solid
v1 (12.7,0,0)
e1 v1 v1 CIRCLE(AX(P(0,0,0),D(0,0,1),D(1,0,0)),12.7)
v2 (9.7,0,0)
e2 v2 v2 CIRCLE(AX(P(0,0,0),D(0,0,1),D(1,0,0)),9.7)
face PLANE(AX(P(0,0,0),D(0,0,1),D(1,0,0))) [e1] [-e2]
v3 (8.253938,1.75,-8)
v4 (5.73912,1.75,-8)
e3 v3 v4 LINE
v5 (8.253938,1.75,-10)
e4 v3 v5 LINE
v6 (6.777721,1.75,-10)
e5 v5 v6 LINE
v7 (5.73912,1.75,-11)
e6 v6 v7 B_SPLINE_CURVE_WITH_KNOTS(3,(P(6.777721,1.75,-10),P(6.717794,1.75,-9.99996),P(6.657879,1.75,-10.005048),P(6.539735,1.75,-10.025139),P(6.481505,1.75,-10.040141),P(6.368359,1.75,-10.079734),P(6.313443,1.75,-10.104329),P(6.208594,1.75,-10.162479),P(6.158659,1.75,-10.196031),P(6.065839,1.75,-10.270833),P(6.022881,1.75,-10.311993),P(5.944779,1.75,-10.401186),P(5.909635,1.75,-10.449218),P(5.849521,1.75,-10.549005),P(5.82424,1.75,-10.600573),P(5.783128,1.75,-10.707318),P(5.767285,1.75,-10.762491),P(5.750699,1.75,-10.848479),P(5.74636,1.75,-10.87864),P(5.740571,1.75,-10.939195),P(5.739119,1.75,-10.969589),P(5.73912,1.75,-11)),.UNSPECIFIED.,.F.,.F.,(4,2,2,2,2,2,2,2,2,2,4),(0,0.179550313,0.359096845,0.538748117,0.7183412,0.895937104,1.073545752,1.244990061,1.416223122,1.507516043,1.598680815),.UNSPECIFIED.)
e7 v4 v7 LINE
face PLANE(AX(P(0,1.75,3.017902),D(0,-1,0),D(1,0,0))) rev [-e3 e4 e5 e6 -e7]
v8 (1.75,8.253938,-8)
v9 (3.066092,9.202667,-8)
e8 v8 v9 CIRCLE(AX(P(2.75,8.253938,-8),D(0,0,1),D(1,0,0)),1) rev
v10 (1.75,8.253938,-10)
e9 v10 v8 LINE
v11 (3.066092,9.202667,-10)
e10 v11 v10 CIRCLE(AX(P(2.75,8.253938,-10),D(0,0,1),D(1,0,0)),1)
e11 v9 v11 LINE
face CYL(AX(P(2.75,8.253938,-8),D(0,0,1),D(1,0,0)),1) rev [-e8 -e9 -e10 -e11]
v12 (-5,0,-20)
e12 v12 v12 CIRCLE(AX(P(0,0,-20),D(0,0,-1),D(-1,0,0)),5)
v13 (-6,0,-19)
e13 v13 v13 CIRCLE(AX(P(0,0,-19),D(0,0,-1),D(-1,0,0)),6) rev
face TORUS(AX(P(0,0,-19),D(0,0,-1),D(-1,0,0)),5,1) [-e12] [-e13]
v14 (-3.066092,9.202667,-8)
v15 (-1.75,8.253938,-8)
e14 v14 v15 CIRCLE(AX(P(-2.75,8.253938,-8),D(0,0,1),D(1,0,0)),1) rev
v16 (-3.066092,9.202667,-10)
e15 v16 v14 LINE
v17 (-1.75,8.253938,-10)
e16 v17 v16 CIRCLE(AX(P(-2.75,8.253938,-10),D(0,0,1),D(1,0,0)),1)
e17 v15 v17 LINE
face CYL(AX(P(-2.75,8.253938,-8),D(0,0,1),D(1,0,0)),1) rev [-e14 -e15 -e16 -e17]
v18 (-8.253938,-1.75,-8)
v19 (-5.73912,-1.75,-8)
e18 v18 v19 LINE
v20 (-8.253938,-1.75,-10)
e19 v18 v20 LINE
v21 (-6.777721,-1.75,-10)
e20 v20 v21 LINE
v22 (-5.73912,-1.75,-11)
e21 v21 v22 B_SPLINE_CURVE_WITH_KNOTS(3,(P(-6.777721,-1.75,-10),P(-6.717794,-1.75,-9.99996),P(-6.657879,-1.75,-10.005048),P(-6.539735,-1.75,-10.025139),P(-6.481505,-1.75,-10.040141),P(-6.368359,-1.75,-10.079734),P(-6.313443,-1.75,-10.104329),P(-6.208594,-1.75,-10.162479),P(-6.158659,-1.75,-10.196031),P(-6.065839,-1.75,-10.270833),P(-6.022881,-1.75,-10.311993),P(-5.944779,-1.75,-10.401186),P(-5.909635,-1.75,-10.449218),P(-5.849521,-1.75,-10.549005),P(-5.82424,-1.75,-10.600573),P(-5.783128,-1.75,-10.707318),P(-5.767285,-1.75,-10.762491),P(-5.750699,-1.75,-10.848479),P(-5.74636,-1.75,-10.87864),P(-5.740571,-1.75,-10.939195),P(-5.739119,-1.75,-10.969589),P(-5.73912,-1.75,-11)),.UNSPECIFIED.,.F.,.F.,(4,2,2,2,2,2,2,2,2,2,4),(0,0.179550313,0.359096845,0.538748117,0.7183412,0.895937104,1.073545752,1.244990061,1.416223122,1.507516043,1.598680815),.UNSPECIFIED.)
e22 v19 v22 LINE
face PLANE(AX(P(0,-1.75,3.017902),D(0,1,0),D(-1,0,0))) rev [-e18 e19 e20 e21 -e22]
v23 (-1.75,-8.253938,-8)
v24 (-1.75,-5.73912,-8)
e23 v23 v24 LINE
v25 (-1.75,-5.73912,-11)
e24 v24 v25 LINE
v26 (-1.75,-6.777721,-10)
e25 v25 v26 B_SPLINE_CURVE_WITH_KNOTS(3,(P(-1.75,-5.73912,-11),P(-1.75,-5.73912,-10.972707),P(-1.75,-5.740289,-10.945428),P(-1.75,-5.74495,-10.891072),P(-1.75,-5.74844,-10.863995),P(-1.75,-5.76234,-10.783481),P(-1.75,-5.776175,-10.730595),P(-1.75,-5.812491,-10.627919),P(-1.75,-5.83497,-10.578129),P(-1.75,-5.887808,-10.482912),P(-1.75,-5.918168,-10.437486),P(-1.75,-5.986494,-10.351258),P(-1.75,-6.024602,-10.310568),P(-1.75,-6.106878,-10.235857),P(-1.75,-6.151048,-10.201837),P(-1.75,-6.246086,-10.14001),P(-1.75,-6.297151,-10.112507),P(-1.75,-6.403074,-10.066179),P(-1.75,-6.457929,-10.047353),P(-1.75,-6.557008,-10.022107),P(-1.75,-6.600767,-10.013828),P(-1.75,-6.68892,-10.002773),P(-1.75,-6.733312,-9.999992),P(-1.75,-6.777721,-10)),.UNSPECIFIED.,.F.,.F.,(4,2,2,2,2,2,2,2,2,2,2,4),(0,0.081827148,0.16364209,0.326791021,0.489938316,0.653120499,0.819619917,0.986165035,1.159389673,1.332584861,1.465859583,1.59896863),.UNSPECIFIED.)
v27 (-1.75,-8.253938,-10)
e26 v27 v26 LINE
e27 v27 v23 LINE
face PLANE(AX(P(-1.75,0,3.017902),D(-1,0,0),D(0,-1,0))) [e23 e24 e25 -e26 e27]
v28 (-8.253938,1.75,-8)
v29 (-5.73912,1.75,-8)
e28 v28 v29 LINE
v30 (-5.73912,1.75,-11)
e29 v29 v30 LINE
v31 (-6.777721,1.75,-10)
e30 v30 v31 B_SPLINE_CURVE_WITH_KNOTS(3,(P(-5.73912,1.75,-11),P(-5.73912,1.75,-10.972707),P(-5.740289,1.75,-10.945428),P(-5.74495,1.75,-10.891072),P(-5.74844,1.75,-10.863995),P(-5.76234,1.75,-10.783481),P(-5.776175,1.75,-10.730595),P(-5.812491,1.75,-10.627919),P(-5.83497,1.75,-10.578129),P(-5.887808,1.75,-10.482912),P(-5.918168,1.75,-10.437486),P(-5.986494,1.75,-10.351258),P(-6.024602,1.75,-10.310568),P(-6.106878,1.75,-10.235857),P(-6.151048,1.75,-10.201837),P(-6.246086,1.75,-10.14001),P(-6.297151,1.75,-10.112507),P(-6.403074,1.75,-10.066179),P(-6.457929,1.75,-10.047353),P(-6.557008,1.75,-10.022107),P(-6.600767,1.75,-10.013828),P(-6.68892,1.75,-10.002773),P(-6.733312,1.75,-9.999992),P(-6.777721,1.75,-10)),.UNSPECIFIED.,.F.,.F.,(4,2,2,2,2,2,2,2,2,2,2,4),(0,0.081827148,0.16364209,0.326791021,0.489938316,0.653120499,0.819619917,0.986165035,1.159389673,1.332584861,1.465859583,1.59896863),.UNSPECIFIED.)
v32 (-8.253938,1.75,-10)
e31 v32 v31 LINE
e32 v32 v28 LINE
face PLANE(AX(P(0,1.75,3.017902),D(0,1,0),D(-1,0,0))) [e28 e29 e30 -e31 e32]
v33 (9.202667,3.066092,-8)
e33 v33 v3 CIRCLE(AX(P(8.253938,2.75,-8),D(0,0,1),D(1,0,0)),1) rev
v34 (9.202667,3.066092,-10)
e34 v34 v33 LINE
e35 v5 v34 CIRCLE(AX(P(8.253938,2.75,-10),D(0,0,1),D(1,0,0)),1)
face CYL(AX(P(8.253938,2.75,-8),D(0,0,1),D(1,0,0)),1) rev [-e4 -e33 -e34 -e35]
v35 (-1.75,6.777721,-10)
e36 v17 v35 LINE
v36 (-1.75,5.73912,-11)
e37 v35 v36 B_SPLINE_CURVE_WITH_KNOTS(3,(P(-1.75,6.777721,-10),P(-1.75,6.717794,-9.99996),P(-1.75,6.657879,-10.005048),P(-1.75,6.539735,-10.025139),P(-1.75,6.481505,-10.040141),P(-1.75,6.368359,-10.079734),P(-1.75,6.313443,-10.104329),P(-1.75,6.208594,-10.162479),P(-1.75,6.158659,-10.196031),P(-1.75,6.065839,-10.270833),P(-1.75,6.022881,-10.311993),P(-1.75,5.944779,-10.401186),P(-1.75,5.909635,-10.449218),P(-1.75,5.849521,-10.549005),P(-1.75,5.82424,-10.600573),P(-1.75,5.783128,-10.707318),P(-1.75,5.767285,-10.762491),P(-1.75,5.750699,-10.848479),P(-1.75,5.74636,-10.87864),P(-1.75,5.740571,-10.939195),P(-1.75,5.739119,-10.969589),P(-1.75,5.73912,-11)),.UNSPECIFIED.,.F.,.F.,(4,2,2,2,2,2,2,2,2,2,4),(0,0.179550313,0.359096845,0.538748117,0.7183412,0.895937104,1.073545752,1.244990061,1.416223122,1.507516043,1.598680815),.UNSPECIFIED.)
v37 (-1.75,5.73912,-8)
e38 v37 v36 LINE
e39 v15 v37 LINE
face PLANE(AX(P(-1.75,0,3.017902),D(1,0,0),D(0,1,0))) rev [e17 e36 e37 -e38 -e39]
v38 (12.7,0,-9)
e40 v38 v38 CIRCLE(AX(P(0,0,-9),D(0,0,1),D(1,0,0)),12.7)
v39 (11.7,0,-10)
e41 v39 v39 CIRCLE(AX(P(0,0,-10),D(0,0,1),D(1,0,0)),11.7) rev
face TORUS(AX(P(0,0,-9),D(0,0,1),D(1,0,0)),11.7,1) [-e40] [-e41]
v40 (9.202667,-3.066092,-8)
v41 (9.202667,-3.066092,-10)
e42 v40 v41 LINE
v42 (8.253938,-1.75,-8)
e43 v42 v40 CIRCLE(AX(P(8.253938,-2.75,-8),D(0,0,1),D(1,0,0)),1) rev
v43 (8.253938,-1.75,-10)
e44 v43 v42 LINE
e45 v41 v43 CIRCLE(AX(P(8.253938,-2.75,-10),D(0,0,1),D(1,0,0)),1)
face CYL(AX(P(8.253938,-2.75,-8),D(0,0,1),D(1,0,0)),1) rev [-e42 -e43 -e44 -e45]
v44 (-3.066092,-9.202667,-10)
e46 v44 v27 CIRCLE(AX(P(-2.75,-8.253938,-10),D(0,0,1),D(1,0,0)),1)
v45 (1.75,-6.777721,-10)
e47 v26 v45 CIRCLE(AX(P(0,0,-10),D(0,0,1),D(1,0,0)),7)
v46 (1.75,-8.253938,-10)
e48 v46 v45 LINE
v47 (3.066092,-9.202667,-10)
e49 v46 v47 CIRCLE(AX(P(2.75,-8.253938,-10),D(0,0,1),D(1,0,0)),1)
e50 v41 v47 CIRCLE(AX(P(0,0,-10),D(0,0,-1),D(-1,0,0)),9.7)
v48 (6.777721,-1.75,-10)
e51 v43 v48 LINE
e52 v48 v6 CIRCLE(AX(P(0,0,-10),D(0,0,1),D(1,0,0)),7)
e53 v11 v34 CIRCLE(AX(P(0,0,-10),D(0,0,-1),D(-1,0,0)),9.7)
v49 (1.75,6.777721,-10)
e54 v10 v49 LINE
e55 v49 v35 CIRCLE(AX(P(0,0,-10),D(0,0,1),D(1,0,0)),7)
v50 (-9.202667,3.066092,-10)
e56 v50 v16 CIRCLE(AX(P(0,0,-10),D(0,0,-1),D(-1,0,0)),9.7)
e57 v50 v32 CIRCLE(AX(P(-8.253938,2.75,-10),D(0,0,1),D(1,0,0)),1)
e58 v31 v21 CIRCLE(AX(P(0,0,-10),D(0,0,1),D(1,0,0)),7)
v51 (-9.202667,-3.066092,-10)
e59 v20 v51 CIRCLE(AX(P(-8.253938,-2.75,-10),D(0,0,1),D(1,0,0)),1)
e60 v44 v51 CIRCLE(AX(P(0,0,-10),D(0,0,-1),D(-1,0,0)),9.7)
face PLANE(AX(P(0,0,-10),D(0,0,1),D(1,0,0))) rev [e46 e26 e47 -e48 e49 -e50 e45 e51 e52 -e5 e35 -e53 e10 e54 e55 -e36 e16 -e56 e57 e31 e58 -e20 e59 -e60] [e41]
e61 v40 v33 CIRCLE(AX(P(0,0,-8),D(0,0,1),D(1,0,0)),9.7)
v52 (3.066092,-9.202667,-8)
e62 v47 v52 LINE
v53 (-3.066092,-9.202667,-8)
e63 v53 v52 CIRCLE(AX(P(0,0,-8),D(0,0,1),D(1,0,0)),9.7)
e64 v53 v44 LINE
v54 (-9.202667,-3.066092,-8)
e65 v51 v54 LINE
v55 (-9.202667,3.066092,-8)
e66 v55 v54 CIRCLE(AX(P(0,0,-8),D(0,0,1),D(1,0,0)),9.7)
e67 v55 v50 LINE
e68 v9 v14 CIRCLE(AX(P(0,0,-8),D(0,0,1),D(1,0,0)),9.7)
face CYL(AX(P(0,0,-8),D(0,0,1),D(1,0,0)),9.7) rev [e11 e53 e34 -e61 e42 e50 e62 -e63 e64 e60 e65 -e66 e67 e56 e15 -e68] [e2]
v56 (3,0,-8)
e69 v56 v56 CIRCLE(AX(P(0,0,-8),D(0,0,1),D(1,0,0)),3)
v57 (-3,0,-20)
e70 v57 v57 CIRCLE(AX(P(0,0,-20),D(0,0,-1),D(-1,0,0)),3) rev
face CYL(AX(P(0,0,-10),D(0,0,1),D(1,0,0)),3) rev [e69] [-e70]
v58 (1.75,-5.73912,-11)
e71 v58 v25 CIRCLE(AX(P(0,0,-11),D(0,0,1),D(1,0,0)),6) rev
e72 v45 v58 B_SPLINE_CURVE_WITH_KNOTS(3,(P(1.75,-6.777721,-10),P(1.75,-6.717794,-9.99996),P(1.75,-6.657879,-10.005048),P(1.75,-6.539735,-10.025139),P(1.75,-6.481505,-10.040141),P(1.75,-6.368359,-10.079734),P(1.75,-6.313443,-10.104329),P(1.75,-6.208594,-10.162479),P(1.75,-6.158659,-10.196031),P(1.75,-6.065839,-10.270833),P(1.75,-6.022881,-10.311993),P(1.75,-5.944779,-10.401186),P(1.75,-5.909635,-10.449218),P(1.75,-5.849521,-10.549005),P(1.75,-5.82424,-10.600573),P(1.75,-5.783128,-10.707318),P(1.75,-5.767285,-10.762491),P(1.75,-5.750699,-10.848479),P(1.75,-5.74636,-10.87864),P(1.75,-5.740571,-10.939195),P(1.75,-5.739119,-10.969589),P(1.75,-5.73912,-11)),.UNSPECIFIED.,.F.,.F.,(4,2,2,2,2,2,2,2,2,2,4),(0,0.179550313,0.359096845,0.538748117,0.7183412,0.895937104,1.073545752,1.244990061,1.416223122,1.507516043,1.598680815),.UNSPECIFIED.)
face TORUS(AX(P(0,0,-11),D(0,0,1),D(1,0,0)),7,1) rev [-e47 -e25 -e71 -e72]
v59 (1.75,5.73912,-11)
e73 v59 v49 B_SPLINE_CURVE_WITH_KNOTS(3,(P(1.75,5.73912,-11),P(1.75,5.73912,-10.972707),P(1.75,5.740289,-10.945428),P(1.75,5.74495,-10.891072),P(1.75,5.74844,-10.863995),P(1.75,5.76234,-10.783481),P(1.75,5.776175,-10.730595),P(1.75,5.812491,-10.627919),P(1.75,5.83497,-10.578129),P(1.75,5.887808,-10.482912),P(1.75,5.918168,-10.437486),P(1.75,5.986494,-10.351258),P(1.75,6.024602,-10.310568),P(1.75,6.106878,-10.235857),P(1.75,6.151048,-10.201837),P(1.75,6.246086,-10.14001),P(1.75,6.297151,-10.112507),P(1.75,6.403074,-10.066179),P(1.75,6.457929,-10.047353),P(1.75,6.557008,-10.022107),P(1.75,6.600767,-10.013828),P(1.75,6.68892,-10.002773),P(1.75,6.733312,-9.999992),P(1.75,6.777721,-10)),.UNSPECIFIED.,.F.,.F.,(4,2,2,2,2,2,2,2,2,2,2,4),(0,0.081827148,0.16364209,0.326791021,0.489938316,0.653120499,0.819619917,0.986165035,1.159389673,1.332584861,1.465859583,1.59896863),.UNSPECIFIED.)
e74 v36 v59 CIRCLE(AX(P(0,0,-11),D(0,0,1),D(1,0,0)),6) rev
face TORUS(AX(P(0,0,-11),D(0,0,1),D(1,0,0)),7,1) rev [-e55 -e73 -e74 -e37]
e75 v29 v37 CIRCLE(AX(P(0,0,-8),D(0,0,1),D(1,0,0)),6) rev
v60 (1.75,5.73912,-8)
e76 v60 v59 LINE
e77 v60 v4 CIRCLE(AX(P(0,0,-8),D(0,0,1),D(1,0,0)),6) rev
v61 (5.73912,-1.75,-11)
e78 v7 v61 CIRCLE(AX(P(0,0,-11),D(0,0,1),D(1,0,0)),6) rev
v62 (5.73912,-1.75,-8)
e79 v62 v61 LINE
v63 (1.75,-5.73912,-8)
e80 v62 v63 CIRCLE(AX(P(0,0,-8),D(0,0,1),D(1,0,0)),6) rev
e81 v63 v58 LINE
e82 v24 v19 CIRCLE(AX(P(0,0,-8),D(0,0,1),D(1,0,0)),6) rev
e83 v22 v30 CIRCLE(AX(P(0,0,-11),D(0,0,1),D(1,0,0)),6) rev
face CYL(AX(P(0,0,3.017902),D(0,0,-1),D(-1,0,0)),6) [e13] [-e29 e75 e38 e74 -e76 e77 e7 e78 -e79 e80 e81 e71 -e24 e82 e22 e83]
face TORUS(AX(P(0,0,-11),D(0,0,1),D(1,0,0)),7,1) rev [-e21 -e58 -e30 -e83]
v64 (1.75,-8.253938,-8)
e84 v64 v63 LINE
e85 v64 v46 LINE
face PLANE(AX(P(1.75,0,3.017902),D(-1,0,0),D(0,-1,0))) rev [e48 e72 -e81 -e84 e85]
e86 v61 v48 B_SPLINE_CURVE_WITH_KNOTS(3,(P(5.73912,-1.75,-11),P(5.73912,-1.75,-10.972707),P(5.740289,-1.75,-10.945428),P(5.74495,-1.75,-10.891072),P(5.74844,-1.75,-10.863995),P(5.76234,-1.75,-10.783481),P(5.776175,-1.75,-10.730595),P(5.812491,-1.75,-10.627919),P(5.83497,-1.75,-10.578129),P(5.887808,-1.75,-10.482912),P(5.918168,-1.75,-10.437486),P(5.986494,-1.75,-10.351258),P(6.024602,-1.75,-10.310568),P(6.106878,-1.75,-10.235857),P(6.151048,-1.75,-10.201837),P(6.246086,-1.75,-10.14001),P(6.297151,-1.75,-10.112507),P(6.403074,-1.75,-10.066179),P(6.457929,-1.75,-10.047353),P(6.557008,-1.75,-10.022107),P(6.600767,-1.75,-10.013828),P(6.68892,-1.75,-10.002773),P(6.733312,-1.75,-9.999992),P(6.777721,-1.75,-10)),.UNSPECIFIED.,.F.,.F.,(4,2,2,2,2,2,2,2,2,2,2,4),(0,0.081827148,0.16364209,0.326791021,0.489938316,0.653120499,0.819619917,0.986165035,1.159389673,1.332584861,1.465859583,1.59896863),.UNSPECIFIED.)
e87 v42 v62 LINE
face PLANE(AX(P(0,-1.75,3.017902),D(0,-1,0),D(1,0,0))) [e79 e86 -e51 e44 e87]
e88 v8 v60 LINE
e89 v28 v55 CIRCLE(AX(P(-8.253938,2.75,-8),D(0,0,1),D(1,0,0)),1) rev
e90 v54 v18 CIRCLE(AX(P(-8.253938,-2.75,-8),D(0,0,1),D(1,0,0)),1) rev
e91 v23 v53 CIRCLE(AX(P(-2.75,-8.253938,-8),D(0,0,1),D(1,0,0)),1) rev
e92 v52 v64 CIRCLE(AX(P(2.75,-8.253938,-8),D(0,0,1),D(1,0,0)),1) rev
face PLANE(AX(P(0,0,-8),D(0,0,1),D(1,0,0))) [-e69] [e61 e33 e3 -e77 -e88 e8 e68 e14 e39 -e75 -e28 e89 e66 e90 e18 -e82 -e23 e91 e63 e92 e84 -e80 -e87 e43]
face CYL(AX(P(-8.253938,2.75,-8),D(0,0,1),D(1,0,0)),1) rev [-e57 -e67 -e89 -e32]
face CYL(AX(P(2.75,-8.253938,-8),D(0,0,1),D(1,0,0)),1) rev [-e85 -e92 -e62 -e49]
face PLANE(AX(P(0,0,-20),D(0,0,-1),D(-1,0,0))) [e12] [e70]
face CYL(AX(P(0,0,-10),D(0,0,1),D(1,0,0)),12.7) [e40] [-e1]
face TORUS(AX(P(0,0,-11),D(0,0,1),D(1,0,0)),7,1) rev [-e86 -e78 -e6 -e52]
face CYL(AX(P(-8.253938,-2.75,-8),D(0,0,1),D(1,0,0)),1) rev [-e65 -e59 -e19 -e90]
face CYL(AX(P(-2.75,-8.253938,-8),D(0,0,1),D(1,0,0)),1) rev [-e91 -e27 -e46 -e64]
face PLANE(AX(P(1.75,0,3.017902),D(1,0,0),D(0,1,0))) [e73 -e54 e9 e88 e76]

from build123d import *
from build123d.topology import SkipClean

# Parameters (mm, degrees)
ESBO_O1_R                = 12.7
ESBO_O1_R_2              = 9.7
ESBO_O1_R_3              = 3
RESSALTO_EXTRUS_O1_DEPTH = 10
ESBO_O1_3_R              = 9.7
ESBO_O1_3_R_2            = 3
CORTE_EXTRUS_O1_DEPTH    = 8
CORTE_EXTRUS_O3_START    = -2
CORTE_EXTRUS_O3_DEPTH    = 2
FILETE1_R                = 1
ESBO_O2_5_R              = 6
ESBO_O2_5_R_2            = 3
RESSALTO_EXTRUS_O2_DEPTH = 10
FILETE2_R                = 1
FILETE3_R                = 1
FILETE4_R                = 1


with BuildPart() as part:
    # Esboço1 → Ressalto-extrusão1 (new body)
    # profile 1 of 2: a face of its own
    with BuildSketch(Plane.XY):
        Circle(ESBO_O1_R)
        Circle(ESBO_O1_R_2, mode=Mode.SUBTRACT)
    # profile 2 of 2: a face of its own
    with BuildSketch(Plane.XY):
        Circle(ESBO_O1_R_2)
        Circle(ESBO_O1_R_3, mode=Mode.SUBTRACT)
    extrude(amount=-RESSALTO_EXTRUS_O1_DEPTH)

    # Esboço1<3> → Corte-extrusão1 (cut)
    with BuildSketch(Plane.XY):
        Circle(ESBO_O1_3_R)
        Circle(ESBO_O1_3_R_2, mode=Mode.SUBTRACT)
    extrude(amount=-CORTE_EXTRUS_O1_DEPTH, mode=Mode.SUBTRACT)

    # Esboço2 → Corte-extrusão3 (cut)
    with SkipClean():  # the faces are left unmerged after this step: merging them gives an invalid solid
        with BuildSketch(Plane(origin=(0, 0, -10), x_dir=(-1, 0, 0), z_dir=(0, 0, -1)).offset(CORTE_EXTRUS_O3_START)):
            with BuildLine():
                Line((-1.75, -9.540833), (-1.75, -5.73912))
                ThreePointArc((-1.75, -5.73912), (-4.242641, -4.242641), (-5.73912, -1.75))
                Line((-5.73912, -1.75), (-9.540833, -1.75))
                ThreePointArc((-9.540833, -1.75), (-6.858936, -6.858936), (-1.75, -9.540833))
            make_face()
            with BuildLine():
                Line((-9.540833, 1.75), (-5.73912, 1.75))
                ThreePointArc((-5.73912, 1.75), (-4.242641, 4.242641), (-1.75, 5.73912))
                Line((-1.75, 5.73912), (-1.75, 9.540833))
                ThreePointArc((-1.75, 9.540833), (-6.858936, 6.858936), (-9.540833, 1.75))
            make_face()
            with BuildLine():
                Line((5.73912, 1.75), (9.540833, 1.75))
                ThreePointArc((9.540833, 1.75), (6.858936, 6.858936), (1.75, 9.540833))
                Line((1.75, 9.540833), (1.75, 5.73912))
                ThreePointArc((1.75, 5.73912), (4.242641, 4.242641), (5.73912, 1.75))
            make_face()
            with BuildLine():
                ThreePointArc((1.75, -9.540833), (6.858936, -6.858936), (9.540833, -1.75))
                Line((9.540833, -1.75), (5.73912, -1.75))
                ThreePointArc((5.73912, -1.75), (4.242641, -4.242641), (1.75, -5.73912))
                Line((1.75, -5.73912), (1.75, -9.540833))
            make_face()
        extrude(amount=CORTE_EXTRUS_O3_DEPTH, mode=Mode.SUBTRACT)

    # Filete1
    filete1_edges = [part.edges().sort_by_distance(p)[0] for p in [
        (-9.540833, -1.75, -9),
        (-1.75, -9.540833, -9),
        (-1.75, 9.540833, -9),
        (-9.540833, 1.75, -9),
        (9.540833, 1.75, -9),
        (1.75, 9.540833, -9),
        (1.75, -9.540833, -9),
        (9.540833, -1.75, -9),
    ]]
    fillet(filete1_edges, radius=FILETE1_R)

    # Esboço2<5> → Ressalto-extrusão2 (add)
    with SkipClean():  # the faces are left unmerged after this step: merging them gives an invalid solid
        with BuildSketch(Plane(origin=(0, 0, -10), x_dir=(-1, 0, 0), z_dir=(0, 0, -1))):
            Circle(ESBO_O2_5_R)
            with Locations(Location((0, 0, 0), (0, 0, 180))):
                Circle(ESBO_O2_5_R_2, mode=Mode.SUBTRACT)
        extrude(amount=RESSALTO_EXTRUS_O2_DEPTH)

    # Filete2
    # the kernel refuses this fillet: 1 mm, written as the material it adds along each edge
    with BuildSketch(Plane(origin=(0, 0, -10), x_dir=(-1, 0, 0), z_dir=(0, -1, 0))) as filete2_piece_1_section:
        with BuildLine():
            CenterArc((6 + FILETE2_R, FILETE2_R), FILETE2_R, 180, 90)
            Line((6, FILETE2_R), (6, 0))
            Line((6, 0), (6 + FILETE2_R, 0))
        make_face()
    filete2_piece_1 = revolve(axis=Axis((0, 0, -10), (0, 0, -1)), revolution_arc=40.831345, mode=Mode.PRIVATE)
    filete2_piece_1 = split(filete2_piece_1, bisect_by=Plane(origin=(-6.142197, 1.75, -10.226515), z_dir=(0, -1, 0)), keep=Keep.TOP, mode=Mode.PRIVATE)
    add(filete2_piece_1)
    with BuildSketch(Plane(origin=(0, 0, -10), x_dir=(0.6538481250913037, -0.7566258185619804, 0), z_dir=(0.7566258185619804, 0.6538481250913037, 0))) as filete2_piece_2_section:
        with BuildLine():
            CenterArc((6 + FILETE2_R, FILETE2_R), FILETE2_R, 180, 90)
            Line((6, FILETE2_R), (6, 0))
            Line((6, 0), (6 + FILETE2_R, 0))
        make_face()
    filete2_piece_2 = revolve(axis=Axis((0, 0, -10), (0, 0, -1)), revolution_arc=81.664733, mode=Mode.PRIVATE)
    filete2_piece_2 = split(filete2_piece_2, bisect_by=Plane(origin=(-1.75, -6.142197, -10.226515), z_dir=(1, 0, 0)), keep=Keep.TOP, mode=Mode.PRIVATE)
    filete2_piece_2 = split(filete2_piece_2, bisect_by=Plane(origin=(1.75, -6.142197, -10.226515), z_dir=(-1, 0, 0)), keep=Keep.TOP, mode=Mode.PRIVATE)
    add(filete2_piece_2)
    with BuildSketch(Plane(origin=(0, 0, -10), x_dir=(0.7566258185619548, 0.6538481250913332, 0), z_dir=(-0.6538481250913332, 0.7566258185619548, 0))) as filete2_piece_3_section:
        with BuildLine():
            CenterArc((6 + FILETE2_R, FILETE2_R), FILETE2_R, 180, 90)
            Line((6, FILETE2_R), (6, 0))
            Line((6, 0), (6 + FILETE2_R, 0))
        make_face()
    filete2_piece_3 = revolve(axis=Axis((0, 0, -10), (0, 0, -1)), revolution_arc=81.664733, mode=Mode.PRIVATE)
    filete2_piece_3 = split(filete2_piece_3, bisect_by=Plane(origin=(6.142197, -1.75, -10.226515), z_dir=(0, 1, 0)), keep=Keep.TOP, mode=Mode.PRIVATE)
    filete2_piece_3 = split(filete2_piece_3, bisect_by=Plane(origin=(6.142197, 1.75, -10.226515), z_dir=(0, -1, 0)), keep=Keep.TOP, mode=Mode.PRIVATE)
    add(filete2_piece_3)
    with BuildSketch(Plane(origin=(0, 0, -10), x_dir=(-0.6538481250913029, 0.7566258185619811, 0), z_dir=(-0.7566258185619811, -0.6538481250913029, 0))) as filete2_piece_4_section:
        with BuildLine():
            CenterArc((6 + FILETE2_R, FILETE2_R), FILETE2_R, 180, 90)
            Line((6, FILETE2_R), (6, 0))
            Line((6, 0), (6 + FILETE2_R, 0))
        make_face()
    filete2_piece_4 = revolve(axis=Axis((0, 0, -10), (0, 0, -1)), revolution_arc=81.664733, mode=Mode.PRIVATE)
    filete2_piece_4 = split(filete2_piece_4, bisect_by=Plane(origin=(1.75, 6.142197, -10.226515), z_dir=(-1, 0, 0)), keep=Keep.TOP, mode=Mode.PRIVATE)
    filete2_piece_4 = split(filete2_piece_4, bisect_by=Plane(origin=(-1.75, 6.142197, -10.226515), z_dir=(1, 0, 0)), keep=Keep.TOP, mode=Mode.PRIVATE)
    add(filete2_piece_4)
    with BuildSketch(Plane(origin=(0, 0, -10), x_dir=(-0.7566374717500711, -0.6538346399080277, 0), z_dir=(0.6538346399080277, -0.7566374717500711, 0))) as filete2_piece_5_section:
        with BuildLine():
            CenterArc((6 + FILETE2_R, FILETE2_R), FILETE2_R, 180, 90)
            Line((6, FILETE2_R), (6, 0))
            Line((6, 0), (6 + FILETE2_R, 0))
        make_face()
    filete2_piece_5 = revolve(axis=Axis((0, 0, -10), (0, 0, -1)), revolution_arc=40.831345, mode=Mode.PRIVATE)
    filete2_piece_5 = split(filete2_piece_5, bisect_by=Plane(origin=(-6.142196, -1.75, -10.226515), z_dir=(0, 1, 0)), keep=Keep.TOP, mode=Mode.PRIVATE)
    add(filete2_piece_5)

    # Filete3
    filete3_edges = [part.edges().sort_by_distance(p)[0] for p in [
        (6, 0, -20),
    ]]
    fillet(filete3_edges, radius=FILETE3_R)

    # Filete4
    filete4_edges = [part.edges().sort_by_distance(p)[0] for p in [
        (-12.7, 0, -10),
    ]]
    fillet(filete4_edges, radius=FILETE4_R)


solid = part.part
